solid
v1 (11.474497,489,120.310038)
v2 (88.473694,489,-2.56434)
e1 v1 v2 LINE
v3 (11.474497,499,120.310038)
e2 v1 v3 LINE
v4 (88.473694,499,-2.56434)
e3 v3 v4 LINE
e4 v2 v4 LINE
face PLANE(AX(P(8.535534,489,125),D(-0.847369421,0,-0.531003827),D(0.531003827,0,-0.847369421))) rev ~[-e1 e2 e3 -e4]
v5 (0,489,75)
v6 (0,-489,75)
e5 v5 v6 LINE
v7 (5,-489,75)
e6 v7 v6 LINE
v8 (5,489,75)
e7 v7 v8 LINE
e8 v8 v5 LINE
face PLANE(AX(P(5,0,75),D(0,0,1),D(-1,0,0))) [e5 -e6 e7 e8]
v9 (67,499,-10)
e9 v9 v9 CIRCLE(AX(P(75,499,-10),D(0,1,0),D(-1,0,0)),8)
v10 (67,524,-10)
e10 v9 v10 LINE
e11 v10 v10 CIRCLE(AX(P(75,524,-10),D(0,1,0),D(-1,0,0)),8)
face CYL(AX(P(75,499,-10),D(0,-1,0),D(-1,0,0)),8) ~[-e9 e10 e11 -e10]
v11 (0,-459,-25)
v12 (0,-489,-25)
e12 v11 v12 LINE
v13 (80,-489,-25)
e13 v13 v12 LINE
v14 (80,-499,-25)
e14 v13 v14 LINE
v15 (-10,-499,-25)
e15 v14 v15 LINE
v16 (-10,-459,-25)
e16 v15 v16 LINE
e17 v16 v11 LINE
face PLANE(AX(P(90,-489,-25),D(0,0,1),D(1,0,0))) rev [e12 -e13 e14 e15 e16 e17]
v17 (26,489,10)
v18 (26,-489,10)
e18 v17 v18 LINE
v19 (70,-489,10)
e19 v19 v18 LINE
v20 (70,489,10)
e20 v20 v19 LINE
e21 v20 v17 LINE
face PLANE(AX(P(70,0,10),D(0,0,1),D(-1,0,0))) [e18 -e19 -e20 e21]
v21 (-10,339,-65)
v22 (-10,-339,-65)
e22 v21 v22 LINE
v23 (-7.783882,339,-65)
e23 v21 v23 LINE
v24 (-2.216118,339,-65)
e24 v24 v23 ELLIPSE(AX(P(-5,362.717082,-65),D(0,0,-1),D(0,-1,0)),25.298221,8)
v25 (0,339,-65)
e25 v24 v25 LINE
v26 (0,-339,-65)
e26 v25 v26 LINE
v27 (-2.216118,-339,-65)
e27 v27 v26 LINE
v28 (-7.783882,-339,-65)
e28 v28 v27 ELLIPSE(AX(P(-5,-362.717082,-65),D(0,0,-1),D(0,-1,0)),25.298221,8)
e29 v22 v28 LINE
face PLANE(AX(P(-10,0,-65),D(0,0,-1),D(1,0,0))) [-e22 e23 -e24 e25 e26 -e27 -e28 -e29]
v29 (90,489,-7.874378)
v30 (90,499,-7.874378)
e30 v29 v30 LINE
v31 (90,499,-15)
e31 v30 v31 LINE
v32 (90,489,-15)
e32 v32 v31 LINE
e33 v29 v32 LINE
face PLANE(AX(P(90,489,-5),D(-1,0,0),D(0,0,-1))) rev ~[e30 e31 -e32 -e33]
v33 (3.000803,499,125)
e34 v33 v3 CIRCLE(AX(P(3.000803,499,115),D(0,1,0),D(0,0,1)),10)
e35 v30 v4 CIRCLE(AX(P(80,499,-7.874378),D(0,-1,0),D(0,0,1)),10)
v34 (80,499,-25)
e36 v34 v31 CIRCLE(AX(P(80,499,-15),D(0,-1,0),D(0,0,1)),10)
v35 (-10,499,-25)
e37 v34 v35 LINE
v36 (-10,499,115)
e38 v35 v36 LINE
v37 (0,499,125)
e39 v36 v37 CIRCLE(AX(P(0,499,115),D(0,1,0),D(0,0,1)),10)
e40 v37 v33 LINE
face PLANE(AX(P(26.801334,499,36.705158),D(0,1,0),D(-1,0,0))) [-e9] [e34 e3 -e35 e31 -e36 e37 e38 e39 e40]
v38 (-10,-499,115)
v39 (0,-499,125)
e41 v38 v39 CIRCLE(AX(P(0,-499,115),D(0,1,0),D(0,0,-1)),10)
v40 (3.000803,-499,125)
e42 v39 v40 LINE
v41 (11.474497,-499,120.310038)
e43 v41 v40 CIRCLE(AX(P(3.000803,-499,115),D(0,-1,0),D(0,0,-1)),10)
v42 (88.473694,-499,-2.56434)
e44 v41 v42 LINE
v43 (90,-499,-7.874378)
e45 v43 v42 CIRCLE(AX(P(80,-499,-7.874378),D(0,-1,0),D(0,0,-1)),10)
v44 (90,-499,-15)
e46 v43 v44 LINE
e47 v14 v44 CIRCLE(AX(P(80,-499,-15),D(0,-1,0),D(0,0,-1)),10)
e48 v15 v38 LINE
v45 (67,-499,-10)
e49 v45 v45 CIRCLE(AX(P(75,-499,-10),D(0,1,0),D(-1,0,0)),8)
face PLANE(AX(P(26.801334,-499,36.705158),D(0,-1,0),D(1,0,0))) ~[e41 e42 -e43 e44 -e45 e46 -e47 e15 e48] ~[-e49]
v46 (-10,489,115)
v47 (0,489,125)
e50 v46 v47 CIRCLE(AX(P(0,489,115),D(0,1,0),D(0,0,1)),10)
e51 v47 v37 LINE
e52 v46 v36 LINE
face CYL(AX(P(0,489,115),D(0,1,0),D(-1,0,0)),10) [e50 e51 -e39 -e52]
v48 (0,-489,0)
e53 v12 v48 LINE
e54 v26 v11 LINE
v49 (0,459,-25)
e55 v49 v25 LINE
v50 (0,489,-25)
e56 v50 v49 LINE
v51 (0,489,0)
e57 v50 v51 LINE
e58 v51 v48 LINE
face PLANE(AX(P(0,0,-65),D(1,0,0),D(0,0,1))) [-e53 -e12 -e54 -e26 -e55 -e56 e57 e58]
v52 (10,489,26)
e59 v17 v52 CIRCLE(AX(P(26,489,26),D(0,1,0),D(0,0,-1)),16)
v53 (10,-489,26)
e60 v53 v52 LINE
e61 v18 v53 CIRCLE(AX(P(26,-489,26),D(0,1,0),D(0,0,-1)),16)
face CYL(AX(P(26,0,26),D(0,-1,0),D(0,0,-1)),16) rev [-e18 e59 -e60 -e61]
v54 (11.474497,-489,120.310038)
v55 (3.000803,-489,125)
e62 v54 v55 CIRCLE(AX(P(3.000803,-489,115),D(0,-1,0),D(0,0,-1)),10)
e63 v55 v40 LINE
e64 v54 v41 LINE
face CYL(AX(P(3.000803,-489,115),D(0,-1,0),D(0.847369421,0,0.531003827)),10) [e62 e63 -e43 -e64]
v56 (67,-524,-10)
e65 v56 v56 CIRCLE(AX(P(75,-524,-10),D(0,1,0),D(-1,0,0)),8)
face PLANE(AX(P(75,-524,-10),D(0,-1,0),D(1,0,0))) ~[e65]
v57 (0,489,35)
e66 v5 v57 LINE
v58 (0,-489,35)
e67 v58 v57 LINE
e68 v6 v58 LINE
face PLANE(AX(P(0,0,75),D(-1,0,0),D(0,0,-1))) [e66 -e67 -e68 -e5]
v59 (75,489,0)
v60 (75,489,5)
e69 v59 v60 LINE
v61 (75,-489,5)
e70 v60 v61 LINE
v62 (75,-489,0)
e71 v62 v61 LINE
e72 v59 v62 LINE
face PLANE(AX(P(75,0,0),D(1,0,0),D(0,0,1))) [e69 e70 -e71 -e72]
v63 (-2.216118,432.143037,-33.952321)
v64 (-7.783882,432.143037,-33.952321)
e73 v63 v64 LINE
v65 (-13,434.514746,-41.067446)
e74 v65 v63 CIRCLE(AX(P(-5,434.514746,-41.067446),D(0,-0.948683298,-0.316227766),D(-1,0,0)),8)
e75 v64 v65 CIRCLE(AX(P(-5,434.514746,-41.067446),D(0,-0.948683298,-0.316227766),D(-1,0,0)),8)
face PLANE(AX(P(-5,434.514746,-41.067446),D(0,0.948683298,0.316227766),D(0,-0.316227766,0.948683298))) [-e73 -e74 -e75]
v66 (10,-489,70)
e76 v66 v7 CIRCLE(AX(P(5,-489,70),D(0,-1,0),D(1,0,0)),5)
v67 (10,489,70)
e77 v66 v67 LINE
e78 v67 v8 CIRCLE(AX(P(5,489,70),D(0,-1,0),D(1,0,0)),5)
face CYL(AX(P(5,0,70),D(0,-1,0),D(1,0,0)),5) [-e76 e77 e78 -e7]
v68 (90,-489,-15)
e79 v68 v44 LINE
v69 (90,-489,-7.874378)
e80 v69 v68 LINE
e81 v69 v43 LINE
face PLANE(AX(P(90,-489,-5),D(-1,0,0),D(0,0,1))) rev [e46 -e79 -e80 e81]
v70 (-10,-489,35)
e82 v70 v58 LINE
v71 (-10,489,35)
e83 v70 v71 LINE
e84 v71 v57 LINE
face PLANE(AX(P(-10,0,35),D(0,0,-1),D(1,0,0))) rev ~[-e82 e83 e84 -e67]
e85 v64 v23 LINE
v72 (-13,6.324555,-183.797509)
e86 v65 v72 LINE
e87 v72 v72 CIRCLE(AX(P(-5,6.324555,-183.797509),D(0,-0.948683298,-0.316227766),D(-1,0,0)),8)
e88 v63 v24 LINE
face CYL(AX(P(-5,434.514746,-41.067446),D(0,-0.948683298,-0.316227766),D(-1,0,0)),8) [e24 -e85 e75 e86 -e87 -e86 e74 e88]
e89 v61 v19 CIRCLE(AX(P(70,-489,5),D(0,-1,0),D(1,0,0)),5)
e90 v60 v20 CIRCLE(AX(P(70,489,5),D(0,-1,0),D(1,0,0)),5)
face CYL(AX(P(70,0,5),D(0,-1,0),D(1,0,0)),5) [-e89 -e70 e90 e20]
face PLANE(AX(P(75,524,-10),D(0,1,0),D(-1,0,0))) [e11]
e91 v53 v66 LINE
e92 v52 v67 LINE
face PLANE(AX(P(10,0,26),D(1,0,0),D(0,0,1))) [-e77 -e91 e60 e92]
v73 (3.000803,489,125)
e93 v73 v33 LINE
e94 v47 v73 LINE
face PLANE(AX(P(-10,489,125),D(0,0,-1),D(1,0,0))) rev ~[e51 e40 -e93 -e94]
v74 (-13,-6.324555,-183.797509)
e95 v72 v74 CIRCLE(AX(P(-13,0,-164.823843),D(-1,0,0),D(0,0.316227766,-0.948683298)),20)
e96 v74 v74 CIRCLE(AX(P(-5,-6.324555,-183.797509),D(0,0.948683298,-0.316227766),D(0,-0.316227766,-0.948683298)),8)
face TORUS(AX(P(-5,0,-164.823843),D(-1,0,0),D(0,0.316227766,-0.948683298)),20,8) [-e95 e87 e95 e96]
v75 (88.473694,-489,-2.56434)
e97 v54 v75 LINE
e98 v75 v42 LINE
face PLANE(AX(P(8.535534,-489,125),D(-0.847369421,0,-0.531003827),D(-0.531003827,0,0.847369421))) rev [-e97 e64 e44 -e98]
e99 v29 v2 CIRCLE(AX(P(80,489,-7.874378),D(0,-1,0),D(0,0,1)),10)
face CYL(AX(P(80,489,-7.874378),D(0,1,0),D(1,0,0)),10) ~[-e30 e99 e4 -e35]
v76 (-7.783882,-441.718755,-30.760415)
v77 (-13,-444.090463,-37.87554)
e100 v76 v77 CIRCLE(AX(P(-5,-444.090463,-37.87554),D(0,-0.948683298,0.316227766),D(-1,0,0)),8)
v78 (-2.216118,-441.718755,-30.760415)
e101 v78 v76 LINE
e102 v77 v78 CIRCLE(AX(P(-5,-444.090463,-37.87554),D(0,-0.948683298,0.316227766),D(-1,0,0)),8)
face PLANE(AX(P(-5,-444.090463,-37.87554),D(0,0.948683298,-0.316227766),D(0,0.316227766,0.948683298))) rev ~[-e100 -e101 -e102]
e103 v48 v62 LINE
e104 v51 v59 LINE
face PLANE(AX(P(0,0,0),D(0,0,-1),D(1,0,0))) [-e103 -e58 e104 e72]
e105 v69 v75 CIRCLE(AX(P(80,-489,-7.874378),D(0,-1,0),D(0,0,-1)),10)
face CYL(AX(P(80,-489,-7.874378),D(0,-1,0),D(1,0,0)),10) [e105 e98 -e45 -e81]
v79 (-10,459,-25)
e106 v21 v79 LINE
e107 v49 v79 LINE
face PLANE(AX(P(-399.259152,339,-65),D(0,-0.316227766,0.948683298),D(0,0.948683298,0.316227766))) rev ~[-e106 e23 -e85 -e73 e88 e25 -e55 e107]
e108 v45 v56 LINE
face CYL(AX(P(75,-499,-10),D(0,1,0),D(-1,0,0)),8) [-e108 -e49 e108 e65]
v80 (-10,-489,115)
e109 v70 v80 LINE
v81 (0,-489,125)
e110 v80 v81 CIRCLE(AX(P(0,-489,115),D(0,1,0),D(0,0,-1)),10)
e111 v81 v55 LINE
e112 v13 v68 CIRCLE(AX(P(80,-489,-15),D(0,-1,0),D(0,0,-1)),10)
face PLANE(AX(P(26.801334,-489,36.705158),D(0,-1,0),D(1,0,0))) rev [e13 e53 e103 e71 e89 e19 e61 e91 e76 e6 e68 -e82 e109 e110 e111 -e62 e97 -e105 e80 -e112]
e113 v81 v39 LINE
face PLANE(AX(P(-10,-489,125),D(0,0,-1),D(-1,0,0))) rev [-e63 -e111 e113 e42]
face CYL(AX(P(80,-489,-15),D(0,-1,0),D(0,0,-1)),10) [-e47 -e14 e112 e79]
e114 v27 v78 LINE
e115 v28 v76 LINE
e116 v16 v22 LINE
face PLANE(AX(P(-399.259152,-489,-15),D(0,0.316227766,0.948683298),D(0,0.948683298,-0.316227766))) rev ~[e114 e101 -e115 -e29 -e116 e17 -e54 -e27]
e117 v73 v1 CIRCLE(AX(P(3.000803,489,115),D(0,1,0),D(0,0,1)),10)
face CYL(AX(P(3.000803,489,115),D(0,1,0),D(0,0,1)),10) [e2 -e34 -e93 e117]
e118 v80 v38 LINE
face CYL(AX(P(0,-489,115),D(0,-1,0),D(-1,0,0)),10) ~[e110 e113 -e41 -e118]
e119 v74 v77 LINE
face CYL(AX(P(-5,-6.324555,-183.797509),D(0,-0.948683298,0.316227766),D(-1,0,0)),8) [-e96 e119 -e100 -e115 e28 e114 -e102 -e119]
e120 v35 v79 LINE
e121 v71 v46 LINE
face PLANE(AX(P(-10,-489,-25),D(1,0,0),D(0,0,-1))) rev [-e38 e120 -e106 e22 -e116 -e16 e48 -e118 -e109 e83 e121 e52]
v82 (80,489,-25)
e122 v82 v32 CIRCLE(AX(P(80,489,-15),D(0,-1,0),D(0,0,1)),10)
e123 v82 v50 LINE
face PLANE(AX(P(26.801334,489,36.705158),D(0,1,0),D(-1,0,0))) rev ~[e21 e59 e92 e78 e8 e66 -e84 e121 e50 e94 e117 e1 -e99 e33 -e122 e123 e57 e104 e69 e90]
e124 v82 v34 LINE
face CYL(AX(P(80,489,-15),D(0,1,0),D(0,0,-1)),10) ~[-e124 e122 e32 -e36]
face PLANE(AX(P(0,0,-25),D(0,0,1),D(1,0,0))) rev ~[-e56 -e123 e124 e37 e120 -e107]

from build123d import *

# Parameters (mm, degrees)
F1_DEPTH      = 489
F1_DEPTH_BACK = 489
F2_W          = 10
F2_H          = 100
F3_DEPTH      = 489
F3_DEPTH_BACK = 489
F5_DEPTH      = 10
F6_R          = 10
F7_R          = 8
F8_DEPTH      = 25
F9_T4_DEPTH   = 788.5183031967
F9_T9_DEPTH   = 788.5183031967
F13_R         = 8


# Not quite as in the source:
# - a fillet or chamfer that OpenCascade refuses, or shapes differently, is made with other operations: its cross-section is extruded or revolved along the edge and cut away or added
# - a pattern or mirror of a feature is missing from the dataset's text; its kind, count and spacing are read off the source's solid
# - a feature names something its author has since deleted; it is built from what else it names


with BuildPart() as f1:
    # F0 (on Front) → F1 (new body, two sides)
    with BuildSketch(Plane.XZ) as f1_sk:
        with BuildLine():
            Line((5, 75), (0, 75))
            Line((0, 75), (0, 0))
            Line((0, 0), (75, 0))
            Line((75, 0), (75, 5))
            ThreePointArc((75, 5), (73.5355339059, 8.5355339059), (70, 10))
            Line((70, 10), (26, 10))
            ThreePointArc((26, 10), (14.686291501, 14.686291501), (10, 26))
            Line((10, 26), (10, 70))
            ThreePointArc((10, 70), (8.5355339059, 73.5355339059), (5, 75))
        make_face()
    extrude(amount=F1_DEPTH)
    extrude(f1_sk.sketch, amount=-F1_DEPTH_BACK)

    # F2 (on Front) → F3 (join, two sides)
    with BuildSketch(Plane.XZ) as f3_sk:
        with Locations((-5, -15)):
            Rectangle(F2_W, F2_H)
    extrude(amount=F3_DEPTH)
    extrude(f3_sk.sketch, amount=-F3_DEPTH_BACK)

    # F4 (on face) → F5 (join)
    with BuildSketch(Plane(origin=(0, 489, 0), x_dir=(-1, 0, 0), z_dir=(0, 1, 0))):
        Polygon((-90, -25), (10, -25), (10, 125), (-8.5355339059, 125), (-90, -5), align=None)
    f5 = extrude(amount=F5_DEPTH)

    # F5_copies: F5 across plane
    add(f5.mirror(Plane(origin=(0, 0, 0), x_dir=(0, 0, -1), z_dir=(0, -1, 0))))

    # F6
    f6_edges = [f1.edges().sort_by_distance(p)[0] for p in [
        (8.535534, 494, 125),
        (90, 494, -5),
        (90, 494, -25),
        (-10, 494, 125),
        (-10, -494, 125),
        (8.535534, -494, 125),
        (90, -494, -25),
        (90, -494, -5),
    ]]
    fillet(f6_edges, radius=F6_R)

    # F7 (on face) → F8 (join)
    with BuildSketch(Plane(origin=(0, 499, 0), x_dir=(-1, 0, 0), z_dir=(0, 1, 0))):
        with Locations((-75, -10)):
            Circle(F7_R)
    f8 = extrude(amount=F8_DEPTH)

    # F8_copies: F8 across plane
    add(f8.mirror(Plane(origin=(0, 0, 0), x_dir=(0, 0, -1), z_dir=(0, -1, 0))))

    # F9: chamfer of 150 x 50 on 2 edges, made by hand


with BuildPart() as f9_tool2:
    # F9_s3 → F9_t4 (new body)
    with BuildSketch(Plane.YZ.offset(-399.2591515984)):
        Polygon((-489, -15), (-339, -65), (-489, -65), align=None)
    extrude(amount=F9_T4_DEPTH)

    split(bisect_by=Plane.XY.offset(-25), keep=Keep.BOTTOM)


with BuildPart() as f1_1:
    add(f1.part)

    # F9_t1: cut F9_tool2
    add(f9_tool2.part, mode=Mode.SUBTRACT)


with BuildPart() as f9_tool7:
    # F9_s8 → F9_t9 (new body)
    with BuildSketch(Plane.YZ.offset(-399.2591515984)):
        Polygon((339, -65), (489, -15), (489, -65), align=None)
    extrude(amount=F9_T9_DEPTH)

    split(bisect_by=Plane.XY.offset(-25), keep=Keep.BOTTOM)


with BuildPart() as f1_2:
    add(f1_1.part)

    # F9_t6: cut F9_tool7
    add(f9_tool7.part, mode=Mode.SUBTRACT)

    # F14: sweep along a path in F11
    with BuildLine(Plane(origin=(-5, 0, 0), x_dir=(0, -1, 0), z_dir=(-1, 0, 0))) as f14_path:
        Line((-434.5147456835, -41.0674455892), (-6.3245553203, -183.7975090436))
        ThreePointArc((-6.3245553203, -183.7975090436), (0, -184.8238430826), (6.3245553203, -183.7975090436))
        Line((6.3245553203, -183.7975090436), (444.0904629777, -37.8755398245))
    # F13 (on line) → F14 (sweep)
    with BuildSketch(Plane(origin=(0, 378.7430374384, 126.2476791461), x_dir=(-1, 0, 0), z_dir=(0, 0.9486832981, 0.316227766))):
        with Locations((5, -176.365627053)):
            Circle(F13_R)
    sweep(path=f14_path.line)


solid = f1_2.part
